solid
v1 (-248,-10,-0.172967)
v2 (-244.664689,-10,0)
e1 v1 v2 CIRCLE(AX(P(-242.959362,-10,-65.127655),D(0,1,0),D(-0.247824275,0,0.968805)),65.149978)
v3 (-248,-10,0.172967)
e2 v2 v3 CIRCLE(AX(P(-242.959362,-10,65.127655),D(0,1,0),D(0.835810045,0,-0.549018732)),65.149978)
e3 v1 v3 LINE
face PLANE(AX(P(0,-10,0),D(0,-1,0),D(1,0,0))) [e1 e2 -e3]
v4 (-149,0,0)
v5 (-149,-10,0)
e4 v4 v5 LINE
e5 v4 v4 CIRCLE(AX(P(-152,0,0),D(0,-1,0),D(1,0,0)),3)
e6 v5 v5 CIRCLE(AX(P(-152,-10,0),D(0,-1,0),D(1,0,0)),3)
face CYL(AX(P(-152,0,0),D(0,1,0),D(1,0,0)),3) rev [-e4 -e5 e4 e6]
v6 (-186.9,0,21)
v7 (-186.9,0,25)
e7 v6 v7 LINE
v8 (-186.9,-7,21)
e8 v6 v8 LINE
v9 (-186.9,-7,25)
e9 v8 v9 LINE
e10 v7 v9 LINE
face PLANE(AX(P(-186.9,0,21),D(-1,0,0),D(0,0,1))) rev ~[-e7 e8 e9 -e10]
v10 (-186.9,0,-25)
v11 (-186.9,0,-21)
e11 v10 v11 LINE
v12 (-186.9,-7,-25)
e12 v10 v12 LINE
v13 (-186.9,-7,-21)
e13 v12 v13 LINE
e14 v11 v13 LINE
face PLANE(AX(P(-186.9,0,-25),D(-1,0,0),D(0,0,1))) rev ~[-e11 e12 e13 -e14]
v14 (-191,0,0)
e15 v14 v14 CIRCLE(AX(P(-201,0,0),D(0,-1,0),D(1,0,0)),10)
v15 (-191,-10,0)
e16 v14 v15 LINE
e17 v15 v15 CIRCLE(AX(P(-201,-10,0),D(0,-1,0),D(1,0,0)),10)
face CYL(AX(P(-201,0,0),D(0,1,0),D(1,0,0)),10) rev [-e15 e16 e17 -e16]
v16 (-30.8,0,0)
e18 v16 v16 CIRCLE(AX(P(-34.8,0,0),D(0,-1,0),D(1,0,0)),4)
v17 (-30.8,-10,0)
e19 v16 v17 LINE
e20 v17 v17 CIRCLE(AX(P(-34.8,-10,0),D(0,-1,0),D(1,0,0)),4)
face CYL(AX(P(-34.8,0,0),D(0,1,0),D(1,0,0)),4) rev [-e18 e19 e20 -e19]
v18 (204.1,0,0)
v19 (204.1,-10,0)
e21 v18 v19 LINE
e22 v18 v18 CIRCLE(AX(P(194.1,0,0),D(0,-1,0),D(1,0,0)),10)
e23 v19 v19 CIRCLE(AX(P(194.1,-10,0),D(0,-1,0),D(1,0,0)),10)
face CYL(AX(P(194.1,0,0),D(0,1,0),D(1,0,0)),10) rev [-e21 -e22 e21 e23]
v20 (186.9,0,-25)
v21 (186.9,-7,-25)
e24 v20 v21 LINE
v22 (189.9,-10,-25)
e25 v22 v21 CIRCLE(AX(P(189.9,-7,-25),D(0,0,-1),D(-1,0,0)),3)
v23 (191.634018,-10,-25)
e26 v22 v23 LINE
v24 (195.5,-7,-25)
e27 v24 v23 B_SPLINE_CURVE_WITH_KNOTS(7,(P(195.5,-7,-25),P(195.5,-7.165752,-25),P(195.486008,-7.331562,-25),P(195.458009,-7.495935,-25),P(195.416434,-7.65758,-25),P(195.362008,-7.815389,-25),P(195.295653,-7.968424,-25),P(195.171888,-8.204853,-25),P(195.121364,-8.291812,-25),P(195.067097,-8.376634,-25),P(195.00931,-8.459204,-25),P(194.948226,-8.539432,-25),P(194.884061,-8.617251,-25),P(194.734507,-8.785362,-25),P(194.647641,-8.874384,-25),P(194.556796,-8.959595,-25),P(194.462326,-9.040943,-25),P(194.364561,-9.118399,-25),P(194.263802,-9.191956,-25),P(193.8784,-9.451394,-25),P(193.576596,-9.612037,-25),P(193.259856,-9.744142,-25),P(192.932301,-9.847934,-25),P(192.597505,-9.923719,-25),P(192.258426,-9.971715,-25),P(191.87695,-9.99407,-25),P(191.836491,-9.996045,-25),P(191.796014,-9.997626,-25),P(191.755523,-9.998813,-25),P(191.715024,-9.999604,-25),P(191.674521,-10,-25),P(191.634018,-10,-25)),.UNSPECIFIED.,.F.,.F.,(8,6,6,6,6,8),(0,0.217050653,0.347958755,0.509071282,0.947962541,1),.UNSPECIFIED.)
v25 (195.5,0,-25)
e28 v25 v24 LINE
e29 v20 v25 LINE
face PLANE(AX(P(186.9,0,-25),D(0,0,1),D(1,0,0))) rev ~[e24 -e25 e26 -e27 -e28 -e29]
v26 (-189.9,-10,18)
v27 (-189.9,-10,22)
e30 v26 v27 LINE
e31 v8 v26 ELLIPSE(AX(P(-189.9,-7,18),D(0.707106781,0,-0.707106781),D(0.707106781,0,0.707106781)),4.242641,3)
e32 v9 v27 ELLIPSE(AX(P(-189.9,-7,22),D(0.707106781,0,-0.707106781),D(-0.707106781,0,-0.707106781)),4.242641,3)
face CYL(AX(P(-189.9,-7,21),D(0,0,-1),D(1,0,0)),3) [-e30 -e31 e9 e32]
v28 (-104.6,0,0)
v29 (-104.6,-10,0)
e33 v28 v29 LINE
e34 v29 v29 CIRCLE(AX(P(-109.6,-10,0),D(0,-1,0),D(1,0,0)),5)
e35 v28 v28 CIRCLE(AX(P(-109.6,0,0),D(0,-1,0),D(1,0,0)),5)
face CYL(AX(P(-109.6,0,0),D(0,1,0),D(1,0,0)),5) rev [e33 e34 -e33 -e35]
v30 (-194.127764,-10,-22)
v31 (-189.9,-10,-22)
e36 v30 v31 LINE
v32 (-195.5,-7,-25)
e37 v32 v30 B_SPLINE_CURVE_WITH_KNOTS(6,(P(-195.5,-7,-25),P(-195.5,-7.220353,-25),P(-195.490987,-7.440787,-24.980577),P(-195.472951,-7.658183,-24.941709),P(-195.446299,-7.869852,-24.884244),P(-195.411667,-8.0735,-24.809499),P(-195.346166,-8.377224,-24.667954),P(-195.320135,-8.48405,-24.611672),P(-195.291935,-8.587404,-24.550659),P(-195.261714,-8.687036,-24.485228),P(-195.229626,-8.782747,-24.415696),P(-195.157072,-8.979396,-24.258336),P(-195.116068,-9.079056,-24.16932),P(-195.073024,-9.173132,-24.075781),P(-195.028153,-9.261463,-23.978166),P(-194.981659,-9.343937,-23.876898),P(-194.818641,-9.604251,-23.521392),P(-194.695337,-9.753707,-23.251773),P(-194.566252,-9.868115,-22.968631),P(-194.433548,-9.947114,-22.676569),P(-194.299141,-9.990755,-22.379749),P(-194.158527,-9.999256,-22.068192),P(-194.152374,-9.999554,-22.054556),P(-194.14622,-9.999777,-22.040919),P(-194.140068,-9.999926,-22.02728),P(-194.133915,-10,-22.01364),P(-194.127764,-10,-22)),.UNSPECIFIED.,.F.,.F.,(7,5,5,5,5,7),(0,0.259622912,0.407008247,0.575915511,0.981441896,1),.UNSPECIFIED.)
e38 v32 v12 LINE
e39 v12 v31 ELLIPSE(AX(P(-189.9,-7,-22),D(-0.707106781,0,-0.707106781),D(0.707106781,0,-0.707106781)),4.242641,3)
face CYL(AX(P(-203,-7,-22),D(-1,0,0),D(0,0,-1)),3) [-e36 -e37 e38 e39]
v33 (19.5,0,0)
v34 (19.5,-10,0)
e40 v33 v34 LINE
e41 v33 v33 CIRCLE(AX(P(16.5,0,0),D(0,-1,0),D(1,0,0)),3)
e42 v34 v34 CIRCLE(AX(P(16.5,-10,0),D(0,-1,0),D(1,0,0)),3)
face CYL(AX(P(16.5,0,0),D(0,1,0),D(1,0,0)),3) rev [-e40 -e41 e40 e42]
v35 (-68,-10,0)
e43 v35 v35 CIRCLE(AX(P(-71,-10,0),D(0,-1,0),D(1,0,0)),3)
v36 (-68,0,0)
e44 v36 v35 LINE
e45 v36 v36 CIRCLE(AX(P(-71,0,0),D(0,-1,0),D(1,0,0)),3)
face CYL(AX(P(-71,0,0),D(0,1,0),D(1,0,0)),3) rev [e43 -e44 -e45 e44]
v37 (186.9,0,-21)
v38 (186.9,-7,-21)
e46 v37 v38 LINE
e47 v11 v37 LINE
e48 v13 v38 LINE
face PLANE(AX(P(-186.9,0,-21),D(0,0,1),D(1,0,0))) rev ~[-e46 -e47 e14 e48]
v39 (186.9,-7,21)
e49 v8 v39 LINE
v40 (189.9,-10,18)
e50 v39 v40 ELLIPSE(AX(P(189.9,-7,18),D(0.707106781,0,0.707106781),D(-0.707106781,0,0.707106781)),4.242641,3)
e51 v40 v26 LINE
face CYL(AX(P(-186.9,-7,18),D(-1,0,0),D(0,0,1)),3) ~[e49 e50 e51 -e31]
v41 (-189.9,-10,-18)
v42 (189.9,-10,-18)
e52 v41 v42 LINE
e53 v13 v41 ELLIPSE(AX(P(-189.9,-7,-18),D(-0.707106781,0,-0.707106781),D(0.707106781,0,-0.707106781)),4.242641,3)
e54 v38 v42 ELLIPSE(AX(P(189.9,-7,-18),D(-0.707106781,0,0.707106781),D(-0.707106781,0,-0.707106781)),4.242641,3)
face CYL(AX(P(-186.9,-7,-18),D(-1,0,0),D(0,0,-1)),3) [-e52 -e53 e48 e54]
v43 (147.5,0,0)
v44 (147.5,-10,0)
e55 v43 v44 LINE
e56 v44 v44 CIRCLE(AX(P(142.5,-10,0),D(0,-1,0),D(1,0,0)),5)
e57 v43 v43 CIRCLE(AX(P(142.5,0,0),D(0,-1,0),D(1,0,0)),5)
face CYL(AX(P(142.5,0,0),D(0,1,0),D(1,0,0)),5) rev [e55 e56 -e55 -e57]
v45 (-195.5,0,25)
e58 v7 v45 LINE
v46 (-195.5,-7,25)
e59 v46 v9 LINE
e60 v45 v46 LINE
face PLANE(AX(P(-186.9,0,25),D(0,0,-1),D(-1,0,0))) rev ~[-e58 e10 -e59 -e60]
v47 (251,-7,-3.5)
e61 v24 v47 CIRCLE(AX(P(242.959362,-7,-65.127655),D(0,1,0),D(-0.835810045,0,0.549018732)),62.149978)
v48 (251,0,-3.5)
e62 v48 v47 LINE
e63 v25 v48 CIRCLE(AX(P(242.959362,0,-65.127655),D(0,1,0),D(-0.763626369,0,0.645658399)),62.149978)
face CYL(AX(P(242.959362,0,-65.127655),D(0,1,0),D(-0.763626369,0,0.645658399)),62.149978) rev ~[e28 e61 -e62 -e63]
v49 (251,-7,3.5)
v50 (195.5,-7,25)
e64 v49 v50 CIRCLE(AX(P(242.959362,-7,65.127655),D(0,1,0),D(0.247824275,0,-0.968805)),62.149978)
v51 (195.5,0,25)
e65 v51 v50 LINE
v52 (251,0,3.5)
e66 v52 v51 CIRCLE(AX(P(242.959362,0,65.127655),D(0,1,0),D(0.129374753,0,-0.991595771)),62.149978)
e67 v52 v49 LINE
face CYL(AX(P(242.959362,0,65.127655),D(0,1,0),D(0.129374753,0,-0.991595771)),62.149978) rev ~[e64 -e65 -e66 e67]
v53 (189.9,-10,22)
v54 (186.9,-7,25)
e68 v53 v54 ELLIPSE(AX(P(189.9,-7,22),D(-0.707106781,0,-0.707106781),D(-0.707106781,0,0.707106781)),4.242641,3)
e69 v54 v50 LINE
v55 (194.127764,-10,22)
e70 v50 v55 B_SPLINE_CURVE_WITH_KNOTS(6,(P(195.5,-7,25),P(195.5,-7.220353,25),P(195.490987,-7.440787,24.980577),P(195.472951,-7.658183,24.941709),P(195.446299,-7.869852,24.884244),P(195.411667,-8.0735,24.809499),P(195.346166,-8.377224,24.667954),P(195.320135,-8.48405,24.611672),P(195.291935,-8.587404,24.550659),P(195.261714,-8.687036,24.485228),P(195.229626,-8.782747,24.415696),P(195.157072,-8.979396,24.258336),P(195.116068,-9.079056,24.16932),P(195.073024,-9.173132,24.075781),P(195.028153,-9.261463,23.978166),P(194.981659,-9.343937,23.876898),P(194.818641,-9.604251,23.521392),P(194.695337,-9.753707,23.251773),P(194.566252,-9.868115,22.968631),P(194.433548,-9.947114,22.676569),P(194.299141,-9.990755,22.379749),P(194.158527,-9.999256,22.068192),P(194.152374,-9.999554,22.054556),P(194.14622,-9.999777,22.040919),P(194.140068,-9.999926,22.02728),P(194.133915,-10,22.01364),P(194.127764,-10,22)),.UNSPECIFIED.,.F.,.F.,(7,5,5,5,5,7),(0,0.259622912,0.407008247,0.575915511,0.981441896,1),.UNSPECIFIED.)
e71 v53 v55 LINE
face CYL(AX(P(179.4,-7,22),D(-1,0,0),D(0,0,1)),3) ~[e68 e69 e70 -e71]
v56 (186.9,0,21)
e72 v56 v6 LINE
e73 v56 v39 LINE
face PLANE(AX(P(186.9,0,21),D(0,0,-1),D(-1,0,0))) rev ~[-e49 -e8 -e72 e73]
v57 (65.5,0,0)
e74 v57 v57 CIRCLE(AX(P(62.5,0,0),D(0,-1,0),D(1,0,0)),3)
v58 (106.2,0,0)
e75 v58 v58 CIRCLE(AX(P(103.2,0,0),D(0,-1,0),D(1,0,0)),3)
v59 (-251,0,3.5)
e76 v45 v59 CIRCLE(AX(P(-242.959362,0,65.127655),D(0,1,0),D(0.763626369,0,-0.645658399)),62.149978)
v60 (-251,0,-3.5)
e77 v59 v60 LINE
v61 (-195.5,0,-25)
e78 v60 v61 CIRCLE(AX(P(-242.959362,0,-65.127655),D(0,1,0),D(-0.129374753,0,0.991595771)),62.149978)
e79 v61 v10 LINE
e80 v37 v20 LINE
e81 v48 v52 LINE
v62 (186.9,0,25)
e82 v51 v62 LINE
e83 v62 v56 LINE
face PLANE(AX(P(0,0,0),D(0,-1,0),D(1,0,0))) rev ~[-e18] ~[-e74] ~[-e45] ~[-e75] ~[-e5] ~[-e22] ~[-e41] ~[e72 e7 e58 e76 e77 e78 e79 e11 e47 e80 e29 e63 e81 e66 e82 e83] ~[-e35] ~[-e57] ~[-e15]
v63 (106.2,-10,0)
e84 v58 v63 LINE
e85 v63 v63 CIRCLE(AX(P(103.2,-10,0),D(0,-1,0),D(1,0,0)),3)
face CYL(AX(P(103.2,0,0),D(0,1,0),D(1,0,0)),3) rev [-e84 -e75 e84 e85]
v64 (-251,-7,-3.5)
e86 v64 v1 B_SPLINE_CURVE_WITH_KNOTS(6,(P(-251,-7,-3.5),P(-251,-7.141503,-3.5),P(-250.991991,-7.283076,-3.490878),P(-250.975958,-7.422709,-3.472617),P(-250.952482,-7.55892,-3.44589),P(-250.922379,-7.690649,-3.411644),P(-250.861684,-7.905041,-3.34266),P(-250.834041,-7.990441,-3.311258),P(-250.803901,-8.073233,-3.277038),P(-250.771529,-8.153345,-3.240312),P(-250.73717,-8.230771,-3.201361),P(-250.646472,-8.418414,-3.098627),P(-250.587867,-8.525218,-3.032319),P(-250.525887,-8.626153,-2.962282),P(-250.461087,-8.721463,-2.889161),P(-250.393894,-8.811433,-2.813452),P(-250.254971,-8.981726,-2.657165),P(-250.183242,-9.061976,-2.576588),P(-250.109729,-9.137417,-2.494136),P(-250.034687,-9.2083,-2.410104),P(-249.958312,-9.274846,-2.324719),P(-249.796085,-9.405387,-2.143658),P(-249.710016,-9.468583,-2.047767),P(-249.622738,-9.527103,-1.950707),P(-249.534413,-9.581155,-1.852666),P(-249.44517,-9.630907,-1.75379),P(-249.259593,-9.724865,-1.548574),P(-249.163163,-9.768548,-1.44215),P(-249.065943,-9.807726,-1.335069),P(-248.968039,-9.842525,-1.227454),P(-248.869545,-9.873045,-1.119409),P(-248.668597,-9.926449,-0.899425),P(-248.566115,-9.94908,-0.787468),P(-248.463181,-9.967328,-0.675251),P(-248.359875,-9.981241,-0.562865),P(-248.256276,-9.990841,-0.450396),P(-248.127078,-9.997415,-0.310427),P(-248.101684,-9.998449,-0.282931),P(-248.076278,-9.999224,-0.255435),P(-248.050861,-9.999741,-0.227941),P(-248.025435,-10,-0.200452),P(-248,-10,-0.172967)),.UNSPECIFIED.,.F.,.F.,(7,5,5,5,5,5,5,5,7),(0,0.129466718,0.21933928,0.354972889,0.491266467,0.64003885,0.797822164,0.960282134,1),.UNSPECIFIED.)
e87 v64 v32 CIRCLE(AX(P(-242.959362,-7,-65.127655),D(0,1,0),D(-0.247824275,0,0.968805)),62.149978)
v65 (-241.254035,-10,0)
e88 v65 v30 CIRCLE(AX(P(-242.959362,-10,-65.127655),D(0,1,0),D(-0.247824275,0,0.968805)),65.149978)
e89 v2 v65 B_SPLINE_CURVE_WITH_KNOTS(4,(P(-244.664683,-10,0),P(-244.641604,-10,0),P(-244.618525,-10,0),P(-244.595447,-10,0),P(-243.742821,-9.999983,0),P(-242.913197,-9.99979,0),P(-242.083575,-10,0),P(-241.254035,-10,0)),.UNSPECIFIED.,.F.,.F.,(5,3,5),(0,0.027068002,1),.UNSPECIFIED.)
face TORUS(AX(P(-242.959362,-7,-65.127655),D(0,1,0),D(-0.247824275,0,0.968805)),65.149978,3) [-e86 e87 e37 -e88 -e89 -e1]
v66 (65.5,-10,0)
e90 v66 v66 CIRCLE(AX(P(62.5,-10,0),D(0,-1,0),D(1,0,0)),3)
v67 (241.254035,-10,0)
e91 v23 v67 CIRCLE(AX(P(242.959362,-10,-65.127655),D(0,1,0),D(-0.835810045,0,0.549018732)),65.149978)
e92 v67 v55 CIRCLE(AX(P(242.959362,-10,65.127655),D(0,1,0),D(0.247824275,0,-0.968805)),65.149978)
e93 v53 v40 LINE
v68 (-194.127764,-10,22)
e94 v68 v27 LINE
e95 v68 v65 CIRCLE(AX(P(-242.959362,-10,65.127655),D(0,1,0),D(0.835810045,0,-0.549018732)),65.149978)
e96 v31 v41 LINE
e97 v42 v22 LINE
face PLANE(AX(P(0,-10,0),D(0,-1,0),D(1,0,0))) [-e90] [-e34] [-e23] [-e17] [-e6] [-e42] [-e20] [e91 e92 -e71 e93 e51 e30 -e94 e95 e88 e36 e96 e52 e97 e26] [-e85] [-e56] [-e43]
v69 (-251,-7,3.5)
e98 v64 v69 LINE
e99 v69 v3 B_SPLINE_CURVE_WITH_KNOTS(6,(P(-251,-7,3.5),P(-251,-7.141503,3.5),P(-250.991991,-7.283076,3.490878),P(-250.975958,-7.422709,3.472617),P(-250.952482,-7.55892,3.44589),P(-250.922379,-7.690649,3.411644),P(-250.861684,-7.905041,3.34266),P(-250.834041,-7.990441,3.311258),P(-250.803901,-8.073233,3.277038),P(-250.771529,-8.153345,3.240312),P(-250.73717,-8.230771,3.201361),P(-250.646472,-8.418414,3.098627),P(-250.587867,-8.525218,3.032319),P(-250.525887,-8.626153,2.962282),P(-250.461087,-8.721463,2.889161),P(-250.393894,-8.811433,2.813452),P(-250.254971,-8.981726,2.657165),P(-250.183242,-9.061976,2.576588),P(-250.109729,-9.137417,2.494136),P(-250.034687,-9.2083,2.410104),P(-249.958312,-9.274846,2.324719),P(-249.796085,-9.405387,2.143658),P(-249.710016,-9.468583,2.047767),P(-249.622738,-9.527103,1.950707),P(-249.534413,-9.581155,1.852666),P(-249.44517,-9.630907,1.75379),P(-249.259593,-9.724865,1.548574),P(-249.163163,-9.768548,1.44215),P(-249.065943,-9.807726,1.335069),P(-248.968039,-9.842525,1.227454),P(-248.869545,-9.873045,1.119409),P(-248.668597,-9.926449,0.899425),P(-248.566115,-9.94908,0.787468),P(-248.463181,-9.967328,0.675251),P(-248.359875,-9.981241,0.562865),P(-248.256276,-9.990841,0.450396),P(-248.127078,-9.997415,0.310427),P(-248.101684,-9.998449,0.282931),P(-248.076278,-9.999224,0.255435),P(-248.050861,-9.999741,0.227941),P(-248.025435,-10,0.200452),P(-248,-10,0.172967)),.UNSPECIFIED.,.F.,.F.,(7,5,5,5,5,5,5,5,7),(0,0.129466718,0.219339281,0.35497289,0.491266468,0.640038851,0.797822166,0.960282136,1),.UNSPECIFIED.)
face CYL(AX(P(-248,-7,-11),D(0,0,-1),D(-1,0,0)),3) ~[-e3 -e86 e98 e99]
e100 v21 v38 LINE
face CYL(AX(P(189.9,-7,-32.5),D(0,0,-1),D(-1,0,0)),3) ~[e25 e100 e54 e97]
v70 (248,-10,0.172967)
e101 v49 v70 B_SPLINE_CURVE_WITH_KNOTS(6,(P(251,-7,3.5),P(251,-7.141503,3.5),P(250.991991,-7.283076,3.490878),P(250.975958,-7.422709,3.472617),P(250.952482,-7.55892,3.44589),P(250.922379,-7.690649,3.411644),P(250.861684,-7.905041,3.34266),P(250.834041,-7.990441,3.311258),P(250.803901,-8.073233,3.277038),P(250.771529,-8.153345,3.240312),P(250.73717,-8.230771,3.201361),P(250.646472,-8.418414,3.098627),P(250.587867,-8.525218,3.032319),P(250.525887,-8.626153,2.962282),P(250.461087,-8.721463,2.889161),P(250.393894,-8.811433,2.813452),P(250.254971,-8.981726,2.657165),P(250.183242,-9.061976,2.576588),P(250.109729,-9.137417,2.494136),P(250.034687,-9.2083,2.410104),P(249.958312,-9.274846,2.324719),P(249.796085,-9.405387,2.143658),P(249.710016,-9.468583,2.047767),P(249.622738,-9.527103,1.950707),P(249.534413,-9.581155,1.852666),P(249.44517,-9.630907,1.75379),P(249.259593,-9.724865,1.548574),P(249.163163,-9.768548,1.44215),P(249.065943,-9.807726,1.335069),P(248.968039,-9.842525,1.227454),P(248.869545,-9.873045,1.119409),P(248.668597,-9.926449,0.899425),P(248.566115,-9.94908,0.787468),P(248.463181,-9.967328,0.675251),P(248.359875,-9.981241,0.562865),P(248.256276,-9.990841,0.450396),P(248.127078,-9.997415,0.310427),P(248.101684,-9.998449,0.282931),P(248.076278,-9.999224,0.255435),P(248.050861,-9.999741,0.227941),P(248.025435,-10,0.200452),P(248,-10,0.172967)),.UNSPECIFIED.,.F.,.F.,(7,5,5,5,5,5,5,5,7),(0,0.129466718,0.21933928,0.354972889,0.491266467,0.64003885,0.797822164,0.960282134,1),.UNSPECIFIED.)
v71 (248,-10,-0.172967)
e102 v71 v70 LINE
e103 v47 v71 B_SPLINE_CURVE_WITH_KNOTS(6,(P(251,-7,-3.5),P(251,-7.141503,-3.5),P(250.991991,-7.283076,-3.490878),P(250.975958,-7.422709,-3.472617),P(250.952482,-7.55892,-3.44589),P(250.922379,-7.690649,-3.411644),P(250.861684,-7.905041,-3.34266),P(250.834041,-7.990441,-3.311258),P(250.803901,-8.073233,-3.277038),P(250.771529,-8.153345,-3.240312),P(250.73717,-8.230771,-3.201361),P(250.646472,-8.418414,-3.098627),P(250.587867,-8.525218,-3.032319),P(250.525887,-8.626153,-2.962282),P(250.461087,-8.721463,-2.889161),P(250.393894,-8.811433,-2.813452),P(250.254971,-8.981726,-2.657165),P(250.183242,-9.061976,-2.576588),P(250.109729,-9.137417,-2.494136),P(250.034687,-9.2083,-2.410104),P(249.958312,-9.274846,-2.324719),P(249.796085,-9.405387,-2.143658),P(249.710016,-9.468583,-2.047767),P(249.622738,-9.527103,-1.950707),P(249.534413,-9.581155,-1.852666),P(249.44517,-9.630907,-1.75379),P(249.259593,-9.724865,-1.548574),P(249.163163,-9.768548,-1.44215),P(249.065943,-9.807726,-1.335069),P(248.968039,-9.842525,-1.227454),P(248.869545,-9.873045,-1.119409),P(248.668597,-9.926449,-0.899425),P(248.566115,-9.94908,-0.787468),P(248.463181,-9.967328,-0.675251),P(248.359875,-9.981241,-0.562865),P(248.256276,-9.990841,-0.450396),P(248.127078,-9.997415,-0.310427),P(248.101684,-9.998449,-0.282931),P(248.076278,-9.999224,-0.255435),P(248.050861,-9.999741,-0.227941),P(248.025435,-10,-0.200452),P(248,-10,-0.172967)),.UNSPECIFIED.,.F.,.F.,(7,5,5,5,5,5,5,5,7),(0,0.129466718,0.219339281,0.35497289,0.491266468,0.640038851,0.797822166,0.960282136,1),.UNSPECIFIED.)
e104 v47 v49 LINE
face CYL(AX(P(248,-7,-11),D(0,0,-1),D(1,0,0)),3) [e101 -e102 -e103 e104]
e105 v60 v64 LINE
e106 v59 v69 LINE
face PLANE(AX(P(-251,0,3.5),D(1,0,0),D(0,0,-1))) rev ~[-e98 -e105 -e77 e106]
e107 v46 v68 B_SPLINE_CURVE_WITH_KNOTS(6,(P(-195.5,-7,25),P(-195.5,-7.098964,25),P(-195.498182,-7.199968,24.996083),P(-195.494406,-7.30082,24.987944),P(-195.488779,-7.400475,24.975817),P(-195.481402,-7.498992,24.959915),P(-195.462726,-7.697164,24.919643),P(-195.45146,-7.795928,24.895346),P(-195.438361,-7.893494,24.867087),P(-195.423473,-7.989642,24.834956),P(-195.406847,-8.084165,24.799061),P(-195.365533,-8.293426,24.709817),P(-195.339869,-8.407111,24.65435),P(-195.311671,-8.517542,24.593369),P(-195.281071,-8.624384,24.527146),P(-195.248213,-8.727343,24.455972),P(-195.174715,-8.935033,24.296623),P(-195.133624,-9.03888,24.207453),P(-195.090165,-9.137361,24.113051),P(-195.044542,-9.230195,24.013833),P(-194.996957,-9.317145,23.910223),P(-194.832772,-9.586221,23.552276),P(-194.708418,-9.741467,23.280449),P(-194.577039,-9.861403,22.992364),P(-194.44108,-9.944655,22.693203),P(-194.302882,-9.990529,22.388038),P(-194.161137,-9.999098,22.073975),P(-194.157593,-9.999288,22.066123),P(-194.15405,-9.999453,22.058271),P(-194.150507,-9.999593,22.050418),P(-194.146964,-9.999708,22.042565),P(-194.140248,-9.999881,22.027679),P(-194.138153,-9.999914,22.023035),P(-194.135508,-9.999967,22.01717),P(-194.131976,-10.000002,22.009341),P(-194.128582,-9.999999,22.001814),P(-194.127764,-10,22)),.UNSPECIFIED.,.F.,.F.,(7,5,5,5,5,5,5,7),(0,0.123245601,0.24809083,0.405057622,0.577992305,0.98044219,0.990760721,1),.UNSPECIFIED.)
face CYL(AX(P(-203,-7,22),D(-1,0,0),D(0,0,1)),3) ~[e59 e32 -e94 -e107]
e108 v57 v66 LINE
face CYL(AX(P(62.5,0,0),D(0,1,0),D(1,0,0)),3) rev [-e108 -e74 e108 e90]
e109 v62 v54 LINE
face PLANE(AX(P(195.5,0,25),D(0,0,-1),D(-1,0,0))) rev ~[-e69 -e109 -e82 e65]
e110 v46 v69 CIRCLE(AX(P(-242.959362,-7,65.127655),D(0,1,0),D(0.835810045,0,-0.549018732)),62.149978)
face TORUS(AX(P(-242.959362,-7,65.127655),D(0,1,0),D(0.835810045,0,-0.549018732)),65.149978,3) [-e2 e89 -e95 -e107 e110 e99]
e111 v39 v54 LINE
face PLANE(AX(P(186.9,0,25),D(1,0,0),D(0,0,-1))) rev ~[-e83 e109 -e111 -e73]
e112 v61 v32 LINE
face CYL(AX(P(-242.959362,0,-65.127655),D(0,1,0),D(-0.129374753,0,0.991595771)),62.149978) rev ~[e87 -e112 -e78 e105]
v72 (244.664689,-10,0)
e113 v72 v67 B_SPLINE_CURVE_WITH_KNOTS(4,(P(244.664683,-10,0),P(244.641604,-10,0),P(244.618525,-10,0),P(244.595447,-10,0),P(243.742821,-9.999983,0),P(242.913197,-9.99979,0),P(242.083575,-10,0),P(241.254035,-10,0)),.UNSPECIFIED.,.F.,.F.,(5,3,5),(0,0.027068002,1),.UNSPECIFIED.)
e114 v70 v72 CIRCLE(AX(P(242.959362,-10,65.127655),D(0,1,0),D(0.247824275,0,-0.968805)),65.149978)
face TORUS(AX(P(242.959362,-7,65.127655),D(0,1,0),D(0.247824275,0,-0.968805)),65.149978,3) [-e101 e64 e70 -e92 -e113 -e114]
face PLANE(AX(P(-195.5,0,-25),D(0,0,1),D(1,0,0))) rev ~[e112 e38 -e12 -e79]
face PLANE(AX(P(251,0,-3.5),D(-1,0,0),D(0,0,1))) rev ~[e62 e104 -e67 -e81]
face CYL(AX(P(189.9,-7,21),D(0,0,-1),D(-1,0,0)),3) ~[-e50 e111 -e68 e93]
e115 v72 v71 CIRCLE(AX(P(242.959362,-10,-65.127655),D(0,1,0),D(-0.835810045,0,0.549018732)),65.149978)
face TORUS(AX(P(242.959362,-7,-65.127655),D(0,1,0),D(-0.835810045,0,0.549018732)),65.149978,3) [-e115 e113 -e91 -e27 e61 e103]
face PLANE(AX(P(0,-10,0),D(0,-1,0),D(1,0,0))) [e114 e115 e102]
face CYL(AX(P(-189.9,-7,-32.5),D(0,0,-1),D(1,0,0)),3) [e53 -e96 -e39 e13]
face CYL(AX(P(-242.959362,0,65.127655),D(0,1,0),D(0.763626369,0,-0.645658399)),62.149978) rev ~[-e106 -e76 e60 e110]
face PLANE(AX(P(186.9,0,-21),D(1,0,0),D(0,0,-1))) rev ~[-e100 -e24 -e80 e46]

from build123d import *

# Parameters (mm, degrees)
F0_R         = 10
F0_R_2       = 3
F0_R_3       = 5
F0_R_4       = 4
F1_DEPTH     = 10
F2_T1_DEPTH  = 22
F2_T3_DEPTH  = 23.6
F2_T5_DEPTH  = 11.5
F2_T7_DEPTH  = 373.8
F2_T9_DEPTH  = 11.5
F2_T11_DEPTH = 23.6
F2_T14_ANGLE = 71.0490813257
F2_T16_ANGLE = 71.0490813257
F2_T18_ANGLE = 71.0490813257
F2_T20_ANGLE = 71.0490813257
F2_T25_DEPTH = 19
F2_T29_DEPTH = 381.3
F2_T36_DEPTH = 381.3
F2_T40_DEPTH = 19
F2_T47_DEPTH = 19
F2_T51_DEPTH = 381.3
F2_T58_DEPTH = 381.3
F2_T62_DEPTH = 19


# Not quite as in the source:
# - a fillet or chamfer that OpenCascade refuses, or shapes differently, is made with other operations: its cross-section is extruded or revolved along the edge and cut away or added


with BuildPart() as f1:
    # F0 (on Front) → F1 (new body)
    with BuildSketch(Plane.XZ):
        with BuildLine():
            ThreePointArc((251, 3.5), (220.5089399385, 7.1742403064), (195.5, 25))
            Line((195.5, 25), (186.9, 25))
            Line((186.9, 25), (186.9, 21))
            Line((186.9, 21), (-186.9, 21))
            Line((-186.9, 21), (-186.9, 25))
            Line((-186.9, 25), (-195.5, 25))
            ThreePointArc((-195.5, 25), (-220.5089399385, 7.1742403064), (-251, 3.5))
            Line((-251, 3.5), (-251, -3.5))
            ThreePointArc((-251, -3.5), (-220.5089399385, -7.1742403064), (-195.5, -25))
            Line((-195.5, -25), (-186.9, -25))
            Line((-186.9, -25), (-186.9, -21))
            Line((-186.9, -21), (186.9, -21))
            Line((186.9, -21), (186.9, -25))
            Line((186.9, -25), (195.5, -25))
            ThreePointArc((195.5, -25), (220.5089399385, -7.1742403064), (251, -3.5))
            Line((251, -3.5), (251, 3.5))
        make_face()
        with Locations((-201, 0)):
            Circle(F0_R, mode=Mode.SUBTRACT)
        with Locations((-152, 0)):
            Circle(F0_R_2, mode=Mode.SUBTRACT)
        with Locations((-109.6, 0)):
            Circle(F0_R_3, mode=Mode.SUBTRACT)
        with Locations((-71, 0)):
            Circle(F0_R_2, mode=Mode.SUBTRACT)
        with Locations((-34.8, 0)):
            Circle(F0_R_4, mode=Mode.SUBTRACT)
        with Locations((16.5, 0)):
            Circle(F0_R_2, mode=Mode.SUBTRACT)
        with Locations((62.5, 0)):
            Circle(F0_R_2, mode=Mode.SUBTRACT)
        with Locations((103.2, 0)):
            Circle(F0_R_2, mode=Mode.SUBTRACT)
        with Locations((142.5, 0)):
            Circle(F0_R_3, mode=Mode.SUBTRACT)
        with Locations((194.1, 0)):
            Circle(F0_R, mode=Mode.SUBTRACT)
    extrude(amount=F1_DEPTH)

    # F2: fillet of radius 3 on 15 edges, made by hand

    # F2_s2 → F2_t1 (cut)
    with BuildSketch(Plane.XY.offset(-11)):
        with BuildLine():
            ThreePointArc((251, -7), (250.1213203436, -9.1213203436), (248, -10))
            Line((248, -10), (251, -10))
            Line((251, -10), (251, -7))
        make_face()
        with BuildLine():
            ThreePointArc((-251, -7), (-250.1213203436, -9.1213203436), (-248, -10))
            Line((-248, -10), (-251, -10))
            Line((-251, -10), (-251, -7))
        make_face()
    extrude(amount=F2_T1_DEPTH, mode=Mode.SUBTRACT)

    # F2_s4 → F2_t3 (cut)
    with BuildSketch(Plane.YZ.offset(179.4)):
        with BuildLine():
            ThreePointArc((-7, 25), (-9.1213203436, 24.1213203436), (-10, 22))
            Line((-10, 22), (-10, 25))
            Line((-10, 25), (-7, 25))
        make_face()
    extrude(amount=F2_T3_DEPTH, mode=Mode.SUBTRACT)

    # F2_s6 → F2_t5 (cut)
    with BuildSketch(Plane.XY.offset(21)):
        with BuildLine():
            ThreePointArc((186.9, -7), (187.7786796564, -9.1213203436), (189.9, -10))
            Line((189.9, -10), (186.9, -10))
            Line((186.9, -10), (186.9, -7))
        make_face()
        with BuildLine():
            ThreePointArc((-186.9, -7), (-187.7786796564, -9.1213203436), (-189.9, -10))
            Line((-189.9, -10), (-186.9, -10))
            Line((-186.9, -10), (-186.9, -7))
        make_face()
    extrude(amount=F2_T5_DEPTH, mode=Mode.SUBTRACT)

    # F2_s8 → F2_t7 (cut)
    with BuildSketch(Plane.YZ.offset(-186.9)):
        with BuildLine():
            ThreePointArc((-7, 21), (-9.1213203436, 20.1213203436), (-10, 18))
            Line((-10, 18), (-10, 21))
            Line((-10, 21), (-7, 21))
        make_face()
        with BuildLine():
            ThreePointArc((-7, -21), (-9.1213203436, -20.1213203436), (-10, -18))
            Line((-10, -18), (-10, -21))
            Line((-10, -21), (-7, -21))
        make_face()
    extrude(amount=F2_T7_DEPTH, mode=Mode.SUBTRACT)

    # F2_s10 → F2_t9 (cut)
    with BuildSketch(Plane.XY.offset(-32.5)):
        with BuildLine():
            ThreePointArc((186.9, -7), (187.7786796564, -9.1213203436), (189.9, -10))
            Line((189.9, -10), (186.9, -10))
            Line((186.9, -10), (186.9, -7))
        make_face()
        with BuildLine():
            ThreePointArc((-186.9, -7), (-187.7786796564, -9.1213203436), (-189.9, -10))
            Line((-189.9, -10), (-186.9, -10))
            Line((-186.9, -10), (-186.9, -7))
        make_face()
    extrude(amount=F2_T9_DEPTH, mode=Mode.SUBTRACT)

    # F2_s12 → F2_t11 (cut)
    with BuildSketch(Plane.YZ.offset(-203)):
        with BuildLine():
            ThreePointArc((-7, 25), (-9.1213203436, 24.1213203436), (-10, 22))
            Line((-10, 22), (-10, 25))
            Line((-10, 25), (-7, 25))
        make_face()
        with BuildLine():
            ThreePointArc((-7, -25), (-9.1213203436, -24.1213203436), (-10, -22))
            Line((-10, -22), (-10, -25))
            Line((-10, -25), (-7, -25))
        make_face()
    extrude(amount=F2_T11_DEPTH, mode=Mode.SUBTRACT)

    # F2_s13 → F2_t14 (revolve, cut)
    with BuildSketch(Plane(origin=(243.6742780769, 0, 62.3328752784), x_dir=(0, 1, 0), z_dir=(0.9688050004, 0, 0.2478242748))):
        with BuildLine():
            ThreePointArc((-7, -59.2652075087), (-9.1213203436, -60.1438871651), (-10, -62.2652075087))
            Line((-10, -62.2652075087), (-10, -59.2652075087))
            Line((-10, -59.2652075087), (-7, -59.2652075087))
        make_face()
    revolve(axis=Axis((242.9593619468, -10, 65.127655258), (0, 1, 0)), revolution_arc=F2_T14_ANGLE, mode=Mode.SUBTRACT)

    # F2_s15 → F2_t16 (revolve, cut)
    with BuildSketch(Plane(origin=(43.3477149421, 0, 65.9912921941), x_dir=(0, 1, 0), z_dir=(-0.5490187323, 0, -0.8358100452))):
        with BuildLine():
            ThreePointArc((-7, 176.6742001078), (-9.1213203436, 175.7955204514), (-10, 173.6742001078))
            Line((-10, 173.6742001078), (-10, 176.6742001078))
            Line((-10, 176.6742001078), (-7, 176.6742001078))
        make_face()
    revolve(axis=Axis((242.9593619468, -10, -65.127655258), (0, 1, 0)), revolution_arc=F2_T16_ANGLE, mode=Mode.SUBTRACT)

    # F2_s17 → F2_t18 (revolve, cut)
    with BuildSketch(Plane(origin=(-243.6742780769, 0, -62.3328752784), x_dir=(0, 1, 0), z_dir=(-0.9688050004, 0, -0.2478242748))):
        with BuildLine():
            ThreePointArc((-7, -59.2652075087), (-9.1213203436, -60.1438871651), (-10, -62.2652075087))
            Line((-10, -62.2652075087), (-10, -59.2652075087))
            Line((-10, -59.2652075087), (-7, -59.2652075087))
        make_face()
    revolve(axis=Axis((-242.9593619468, -10, -65.127655258), (0, 1, 0)), revolution_arc=F2_T18_ANGLE, mode=Mode.SUBTRACT)

    # F2_s19 → F2_t20 (revolve, cut)
    with BuildSketch(Plane(origin=(-43.3477149421, 0, -65.9912921941), x_dir=(0, 1, 0), z_dir=(0.5490187323, 0, 0.8358100452))):
        with BuildLine():
            ThreePointArc((-7, 176.6742001078), (-9.1213203436, 175.7955204514), (-10, 173.6742001078))
            Line((-10, 173.6742001078), (-10, 176.6742001078))
            Line((-10, 176.6742001078), (-7, 176.6742001078))
        make_face()
    revolve(axis=Axis((-242.9593619468, -10, 65.127655258), (0, 1, 0)), revolution_arc=F2_T20_ANGLE, mode=Mode.SUBTRACT)


with BuildPart() as f2_tool23:
    # F2_s24 → F2_t25 (new body)
    with BuildSketch(Plane.XY.offset(32.5)):
        with BuildLine():
            ThreePointArc((186.9, -7), (187.7786796564, -9.1213203436), (189.9, -10))
            Line((189.9, -10), (186.9, -10))
            Line((186.9, -10), (186.9, -7))
        make_face()
    extrude(amount=-F2_T25_DEPTH)

    split(bisect_by=Plane.XY.offset(21), keep=Keep.BOTTOM)


with BuildPart() as f2_tool27:
    # F2_s28 → F2_t29 (new body)
    with BuildSketch(Plane.YZ.offset(194.4)):
        with BuildLine():
            ThreePointArc((-7, 21), (-9.1213203436, 20.1213203436), (-10, 18))
            Line((-10, 18), (-10, 21))
            Line((-10, 21), (-7, 21))
        make_face()
    extrude(amount=-F2_T29_DEPTH)

    split(bisect_by=Plane.YZ.offset(186.9), keep=Keep.TOP)


with BuildPart() as f2_tool23_1:
    add(f2_tool23.part)

    # F2_t31: intersect F2_tool27
    add(f2_tool27.part, mode=Mode.INTERSECT)


with BuildPart() as f1_1:
    add(f1.part)

    # F2_t21: cut F2_tool23
    add(f2_tool23_1.part, mode=Mode.SUBTRACT)


with BuildPart() as f2_tool34:
    # F2_s35 → F2_t36 (new body)
    with BuildSketch(Plane.YZ.offset(186.9)):
        with BuildLine():
            ThreePointArc((-7, 21), (-9.1213203436, 20.1213203436), (-10, 18))
            Line((-10, 18), (-10, 21))
            Line((-10, 21), (-7, 21))
        make_face()
    extrude(amount=-F2_T36_DEPTH)

    split(bisect_by=Plane.YZ.offset(-186.9), keep=Keep.BOTTOM)


with BuildPart() as f2_tool38:
    # F2_s39 → F2_t40 (new body)
    with BuildSketch(Plane.XY.offset(13.5)):
        with BuildLine():
            ThreePointArc((-186.9, -7), (-187.7786796564, -9.1213203436), (-189.9, -10))
            Line((-189.9, -10), (-186.9, -10))
            Line((-186.9, -10), (-186.9, -7))
        make_face()
    extrude(amount=F2_T40_DEPTH)

    split(bisect_by=Plane.XY.offset(21), keep=Keep.BOTTOM)


with BuildPart() as f2_tool34_1:
    add(f2_tool34.part)

    # F2_t42: intersect F2_tool38
    add(f2_tool38.part, mode=Mode.INTERSECT)


with BuildPart() as f1_2:
    add(f1_1.part)

    # F2_t32: cut F2_tool34
    add(f2_tool34_1.part, mode=Mode.SUBTRACT)


with BuildPart() as f2_tool45:
    # F2_s46 → F2_t47 (new body)
    with BuildSketch(Plane.XY.offset(-32.5)):
        with BuildLine():
            ThreePointArc((-186.9, -7), (-187.7786796564, -9.1213203436), (-189.9, -10))
            Line((-189.9, -10), (-186.9, -10))
            Line((-186.9, -10), (-186.9, -7))
        make_face()
    extrude(amount=F2_T47_DEPTH)

    split(bisect_by=Plane.XY.offset(-21), keep=Keep.TOP)


with BuildPart() as f2_tool49:
    # F2_s50 → F2_t51 (new body)
    with BuildSketch(Plane.YZ.offset(-194.4)):
        with BuildLine():
            ThreePointArc((-7, -21), (-9.1213203436, -20.1213203436), (-10, -18))
            Line((-10, -18), (-10, -21))
            Line((-10, -21), (-7, -21))
        make_face()
    extrude(amount=F2_T51_DEPTH)

    split(bisect_by=Plane.YZ.offset(-186.9), keep=Keep.BOTTOM)


with BuildPart() as f2_tool45_1:
    add(f2_tool45.part)

    # F2_t53: intersect F2_tool49
    add(f2_tool49.part, mode=Mode.INTERSECT)


with BuildPart() as f1_3:
    add(f1_2.part)

    # F2_t43: cut F2_tool45
    add(f2_tool45_1.part, mode=Mode.SUBTRACT)


with BuildPart() as f2_tool56:
    # F2_s57 → F2_t58 (new body)
    with BuildSketch(Plane.YZ.offset(-186.9)):
        with BuildLine():
            ThreePointArc((-7, -21), (-9.1213203436, -20.1213203436), (-10, -18))
            Line((-10, -18), (-10, -21))
            Line((-10, -21), (-7, -21))
        make_face()
    extrude(amount=F2_T58_DEPTH)

    split(bisect_by=Plane.YZ.offset(186.9), keep=Keep.TOP)


with BuildPart() as f2_tool60:
    # F2_s61 → F2_t62 (new body)
    with BuildSketch(Plane.XY.offset(-13.5)):
        with BuildLine():
            ThreePointArc((186.9, -7), (187.7786796564, -9.1213203436), (189.9, -10))
            Line((189.9, -10), (186.9, -10))
            Line((186.9, -10), (186.9, -7))
        make_face()
    extrude(amount=-F2_T62_DEPTH)

    split(bisect_by=Plane.XY.offset(-21), keep=Keep.TOP)


with BuildPart() as f2_tool56_1:
    add(f2_tool56.part)

    # F2_t64: intersect F2_tool60
    add(f2_tool60.part, mode=Mode.INTERSECT)


with BuildPart() as f1_4:
    add(f1_3.part)

    # F2_t54: cut F2_tool56
    add(f2_tool56_1.part, mode=Mode.SUBTRACT)


solid = f1_4.part
